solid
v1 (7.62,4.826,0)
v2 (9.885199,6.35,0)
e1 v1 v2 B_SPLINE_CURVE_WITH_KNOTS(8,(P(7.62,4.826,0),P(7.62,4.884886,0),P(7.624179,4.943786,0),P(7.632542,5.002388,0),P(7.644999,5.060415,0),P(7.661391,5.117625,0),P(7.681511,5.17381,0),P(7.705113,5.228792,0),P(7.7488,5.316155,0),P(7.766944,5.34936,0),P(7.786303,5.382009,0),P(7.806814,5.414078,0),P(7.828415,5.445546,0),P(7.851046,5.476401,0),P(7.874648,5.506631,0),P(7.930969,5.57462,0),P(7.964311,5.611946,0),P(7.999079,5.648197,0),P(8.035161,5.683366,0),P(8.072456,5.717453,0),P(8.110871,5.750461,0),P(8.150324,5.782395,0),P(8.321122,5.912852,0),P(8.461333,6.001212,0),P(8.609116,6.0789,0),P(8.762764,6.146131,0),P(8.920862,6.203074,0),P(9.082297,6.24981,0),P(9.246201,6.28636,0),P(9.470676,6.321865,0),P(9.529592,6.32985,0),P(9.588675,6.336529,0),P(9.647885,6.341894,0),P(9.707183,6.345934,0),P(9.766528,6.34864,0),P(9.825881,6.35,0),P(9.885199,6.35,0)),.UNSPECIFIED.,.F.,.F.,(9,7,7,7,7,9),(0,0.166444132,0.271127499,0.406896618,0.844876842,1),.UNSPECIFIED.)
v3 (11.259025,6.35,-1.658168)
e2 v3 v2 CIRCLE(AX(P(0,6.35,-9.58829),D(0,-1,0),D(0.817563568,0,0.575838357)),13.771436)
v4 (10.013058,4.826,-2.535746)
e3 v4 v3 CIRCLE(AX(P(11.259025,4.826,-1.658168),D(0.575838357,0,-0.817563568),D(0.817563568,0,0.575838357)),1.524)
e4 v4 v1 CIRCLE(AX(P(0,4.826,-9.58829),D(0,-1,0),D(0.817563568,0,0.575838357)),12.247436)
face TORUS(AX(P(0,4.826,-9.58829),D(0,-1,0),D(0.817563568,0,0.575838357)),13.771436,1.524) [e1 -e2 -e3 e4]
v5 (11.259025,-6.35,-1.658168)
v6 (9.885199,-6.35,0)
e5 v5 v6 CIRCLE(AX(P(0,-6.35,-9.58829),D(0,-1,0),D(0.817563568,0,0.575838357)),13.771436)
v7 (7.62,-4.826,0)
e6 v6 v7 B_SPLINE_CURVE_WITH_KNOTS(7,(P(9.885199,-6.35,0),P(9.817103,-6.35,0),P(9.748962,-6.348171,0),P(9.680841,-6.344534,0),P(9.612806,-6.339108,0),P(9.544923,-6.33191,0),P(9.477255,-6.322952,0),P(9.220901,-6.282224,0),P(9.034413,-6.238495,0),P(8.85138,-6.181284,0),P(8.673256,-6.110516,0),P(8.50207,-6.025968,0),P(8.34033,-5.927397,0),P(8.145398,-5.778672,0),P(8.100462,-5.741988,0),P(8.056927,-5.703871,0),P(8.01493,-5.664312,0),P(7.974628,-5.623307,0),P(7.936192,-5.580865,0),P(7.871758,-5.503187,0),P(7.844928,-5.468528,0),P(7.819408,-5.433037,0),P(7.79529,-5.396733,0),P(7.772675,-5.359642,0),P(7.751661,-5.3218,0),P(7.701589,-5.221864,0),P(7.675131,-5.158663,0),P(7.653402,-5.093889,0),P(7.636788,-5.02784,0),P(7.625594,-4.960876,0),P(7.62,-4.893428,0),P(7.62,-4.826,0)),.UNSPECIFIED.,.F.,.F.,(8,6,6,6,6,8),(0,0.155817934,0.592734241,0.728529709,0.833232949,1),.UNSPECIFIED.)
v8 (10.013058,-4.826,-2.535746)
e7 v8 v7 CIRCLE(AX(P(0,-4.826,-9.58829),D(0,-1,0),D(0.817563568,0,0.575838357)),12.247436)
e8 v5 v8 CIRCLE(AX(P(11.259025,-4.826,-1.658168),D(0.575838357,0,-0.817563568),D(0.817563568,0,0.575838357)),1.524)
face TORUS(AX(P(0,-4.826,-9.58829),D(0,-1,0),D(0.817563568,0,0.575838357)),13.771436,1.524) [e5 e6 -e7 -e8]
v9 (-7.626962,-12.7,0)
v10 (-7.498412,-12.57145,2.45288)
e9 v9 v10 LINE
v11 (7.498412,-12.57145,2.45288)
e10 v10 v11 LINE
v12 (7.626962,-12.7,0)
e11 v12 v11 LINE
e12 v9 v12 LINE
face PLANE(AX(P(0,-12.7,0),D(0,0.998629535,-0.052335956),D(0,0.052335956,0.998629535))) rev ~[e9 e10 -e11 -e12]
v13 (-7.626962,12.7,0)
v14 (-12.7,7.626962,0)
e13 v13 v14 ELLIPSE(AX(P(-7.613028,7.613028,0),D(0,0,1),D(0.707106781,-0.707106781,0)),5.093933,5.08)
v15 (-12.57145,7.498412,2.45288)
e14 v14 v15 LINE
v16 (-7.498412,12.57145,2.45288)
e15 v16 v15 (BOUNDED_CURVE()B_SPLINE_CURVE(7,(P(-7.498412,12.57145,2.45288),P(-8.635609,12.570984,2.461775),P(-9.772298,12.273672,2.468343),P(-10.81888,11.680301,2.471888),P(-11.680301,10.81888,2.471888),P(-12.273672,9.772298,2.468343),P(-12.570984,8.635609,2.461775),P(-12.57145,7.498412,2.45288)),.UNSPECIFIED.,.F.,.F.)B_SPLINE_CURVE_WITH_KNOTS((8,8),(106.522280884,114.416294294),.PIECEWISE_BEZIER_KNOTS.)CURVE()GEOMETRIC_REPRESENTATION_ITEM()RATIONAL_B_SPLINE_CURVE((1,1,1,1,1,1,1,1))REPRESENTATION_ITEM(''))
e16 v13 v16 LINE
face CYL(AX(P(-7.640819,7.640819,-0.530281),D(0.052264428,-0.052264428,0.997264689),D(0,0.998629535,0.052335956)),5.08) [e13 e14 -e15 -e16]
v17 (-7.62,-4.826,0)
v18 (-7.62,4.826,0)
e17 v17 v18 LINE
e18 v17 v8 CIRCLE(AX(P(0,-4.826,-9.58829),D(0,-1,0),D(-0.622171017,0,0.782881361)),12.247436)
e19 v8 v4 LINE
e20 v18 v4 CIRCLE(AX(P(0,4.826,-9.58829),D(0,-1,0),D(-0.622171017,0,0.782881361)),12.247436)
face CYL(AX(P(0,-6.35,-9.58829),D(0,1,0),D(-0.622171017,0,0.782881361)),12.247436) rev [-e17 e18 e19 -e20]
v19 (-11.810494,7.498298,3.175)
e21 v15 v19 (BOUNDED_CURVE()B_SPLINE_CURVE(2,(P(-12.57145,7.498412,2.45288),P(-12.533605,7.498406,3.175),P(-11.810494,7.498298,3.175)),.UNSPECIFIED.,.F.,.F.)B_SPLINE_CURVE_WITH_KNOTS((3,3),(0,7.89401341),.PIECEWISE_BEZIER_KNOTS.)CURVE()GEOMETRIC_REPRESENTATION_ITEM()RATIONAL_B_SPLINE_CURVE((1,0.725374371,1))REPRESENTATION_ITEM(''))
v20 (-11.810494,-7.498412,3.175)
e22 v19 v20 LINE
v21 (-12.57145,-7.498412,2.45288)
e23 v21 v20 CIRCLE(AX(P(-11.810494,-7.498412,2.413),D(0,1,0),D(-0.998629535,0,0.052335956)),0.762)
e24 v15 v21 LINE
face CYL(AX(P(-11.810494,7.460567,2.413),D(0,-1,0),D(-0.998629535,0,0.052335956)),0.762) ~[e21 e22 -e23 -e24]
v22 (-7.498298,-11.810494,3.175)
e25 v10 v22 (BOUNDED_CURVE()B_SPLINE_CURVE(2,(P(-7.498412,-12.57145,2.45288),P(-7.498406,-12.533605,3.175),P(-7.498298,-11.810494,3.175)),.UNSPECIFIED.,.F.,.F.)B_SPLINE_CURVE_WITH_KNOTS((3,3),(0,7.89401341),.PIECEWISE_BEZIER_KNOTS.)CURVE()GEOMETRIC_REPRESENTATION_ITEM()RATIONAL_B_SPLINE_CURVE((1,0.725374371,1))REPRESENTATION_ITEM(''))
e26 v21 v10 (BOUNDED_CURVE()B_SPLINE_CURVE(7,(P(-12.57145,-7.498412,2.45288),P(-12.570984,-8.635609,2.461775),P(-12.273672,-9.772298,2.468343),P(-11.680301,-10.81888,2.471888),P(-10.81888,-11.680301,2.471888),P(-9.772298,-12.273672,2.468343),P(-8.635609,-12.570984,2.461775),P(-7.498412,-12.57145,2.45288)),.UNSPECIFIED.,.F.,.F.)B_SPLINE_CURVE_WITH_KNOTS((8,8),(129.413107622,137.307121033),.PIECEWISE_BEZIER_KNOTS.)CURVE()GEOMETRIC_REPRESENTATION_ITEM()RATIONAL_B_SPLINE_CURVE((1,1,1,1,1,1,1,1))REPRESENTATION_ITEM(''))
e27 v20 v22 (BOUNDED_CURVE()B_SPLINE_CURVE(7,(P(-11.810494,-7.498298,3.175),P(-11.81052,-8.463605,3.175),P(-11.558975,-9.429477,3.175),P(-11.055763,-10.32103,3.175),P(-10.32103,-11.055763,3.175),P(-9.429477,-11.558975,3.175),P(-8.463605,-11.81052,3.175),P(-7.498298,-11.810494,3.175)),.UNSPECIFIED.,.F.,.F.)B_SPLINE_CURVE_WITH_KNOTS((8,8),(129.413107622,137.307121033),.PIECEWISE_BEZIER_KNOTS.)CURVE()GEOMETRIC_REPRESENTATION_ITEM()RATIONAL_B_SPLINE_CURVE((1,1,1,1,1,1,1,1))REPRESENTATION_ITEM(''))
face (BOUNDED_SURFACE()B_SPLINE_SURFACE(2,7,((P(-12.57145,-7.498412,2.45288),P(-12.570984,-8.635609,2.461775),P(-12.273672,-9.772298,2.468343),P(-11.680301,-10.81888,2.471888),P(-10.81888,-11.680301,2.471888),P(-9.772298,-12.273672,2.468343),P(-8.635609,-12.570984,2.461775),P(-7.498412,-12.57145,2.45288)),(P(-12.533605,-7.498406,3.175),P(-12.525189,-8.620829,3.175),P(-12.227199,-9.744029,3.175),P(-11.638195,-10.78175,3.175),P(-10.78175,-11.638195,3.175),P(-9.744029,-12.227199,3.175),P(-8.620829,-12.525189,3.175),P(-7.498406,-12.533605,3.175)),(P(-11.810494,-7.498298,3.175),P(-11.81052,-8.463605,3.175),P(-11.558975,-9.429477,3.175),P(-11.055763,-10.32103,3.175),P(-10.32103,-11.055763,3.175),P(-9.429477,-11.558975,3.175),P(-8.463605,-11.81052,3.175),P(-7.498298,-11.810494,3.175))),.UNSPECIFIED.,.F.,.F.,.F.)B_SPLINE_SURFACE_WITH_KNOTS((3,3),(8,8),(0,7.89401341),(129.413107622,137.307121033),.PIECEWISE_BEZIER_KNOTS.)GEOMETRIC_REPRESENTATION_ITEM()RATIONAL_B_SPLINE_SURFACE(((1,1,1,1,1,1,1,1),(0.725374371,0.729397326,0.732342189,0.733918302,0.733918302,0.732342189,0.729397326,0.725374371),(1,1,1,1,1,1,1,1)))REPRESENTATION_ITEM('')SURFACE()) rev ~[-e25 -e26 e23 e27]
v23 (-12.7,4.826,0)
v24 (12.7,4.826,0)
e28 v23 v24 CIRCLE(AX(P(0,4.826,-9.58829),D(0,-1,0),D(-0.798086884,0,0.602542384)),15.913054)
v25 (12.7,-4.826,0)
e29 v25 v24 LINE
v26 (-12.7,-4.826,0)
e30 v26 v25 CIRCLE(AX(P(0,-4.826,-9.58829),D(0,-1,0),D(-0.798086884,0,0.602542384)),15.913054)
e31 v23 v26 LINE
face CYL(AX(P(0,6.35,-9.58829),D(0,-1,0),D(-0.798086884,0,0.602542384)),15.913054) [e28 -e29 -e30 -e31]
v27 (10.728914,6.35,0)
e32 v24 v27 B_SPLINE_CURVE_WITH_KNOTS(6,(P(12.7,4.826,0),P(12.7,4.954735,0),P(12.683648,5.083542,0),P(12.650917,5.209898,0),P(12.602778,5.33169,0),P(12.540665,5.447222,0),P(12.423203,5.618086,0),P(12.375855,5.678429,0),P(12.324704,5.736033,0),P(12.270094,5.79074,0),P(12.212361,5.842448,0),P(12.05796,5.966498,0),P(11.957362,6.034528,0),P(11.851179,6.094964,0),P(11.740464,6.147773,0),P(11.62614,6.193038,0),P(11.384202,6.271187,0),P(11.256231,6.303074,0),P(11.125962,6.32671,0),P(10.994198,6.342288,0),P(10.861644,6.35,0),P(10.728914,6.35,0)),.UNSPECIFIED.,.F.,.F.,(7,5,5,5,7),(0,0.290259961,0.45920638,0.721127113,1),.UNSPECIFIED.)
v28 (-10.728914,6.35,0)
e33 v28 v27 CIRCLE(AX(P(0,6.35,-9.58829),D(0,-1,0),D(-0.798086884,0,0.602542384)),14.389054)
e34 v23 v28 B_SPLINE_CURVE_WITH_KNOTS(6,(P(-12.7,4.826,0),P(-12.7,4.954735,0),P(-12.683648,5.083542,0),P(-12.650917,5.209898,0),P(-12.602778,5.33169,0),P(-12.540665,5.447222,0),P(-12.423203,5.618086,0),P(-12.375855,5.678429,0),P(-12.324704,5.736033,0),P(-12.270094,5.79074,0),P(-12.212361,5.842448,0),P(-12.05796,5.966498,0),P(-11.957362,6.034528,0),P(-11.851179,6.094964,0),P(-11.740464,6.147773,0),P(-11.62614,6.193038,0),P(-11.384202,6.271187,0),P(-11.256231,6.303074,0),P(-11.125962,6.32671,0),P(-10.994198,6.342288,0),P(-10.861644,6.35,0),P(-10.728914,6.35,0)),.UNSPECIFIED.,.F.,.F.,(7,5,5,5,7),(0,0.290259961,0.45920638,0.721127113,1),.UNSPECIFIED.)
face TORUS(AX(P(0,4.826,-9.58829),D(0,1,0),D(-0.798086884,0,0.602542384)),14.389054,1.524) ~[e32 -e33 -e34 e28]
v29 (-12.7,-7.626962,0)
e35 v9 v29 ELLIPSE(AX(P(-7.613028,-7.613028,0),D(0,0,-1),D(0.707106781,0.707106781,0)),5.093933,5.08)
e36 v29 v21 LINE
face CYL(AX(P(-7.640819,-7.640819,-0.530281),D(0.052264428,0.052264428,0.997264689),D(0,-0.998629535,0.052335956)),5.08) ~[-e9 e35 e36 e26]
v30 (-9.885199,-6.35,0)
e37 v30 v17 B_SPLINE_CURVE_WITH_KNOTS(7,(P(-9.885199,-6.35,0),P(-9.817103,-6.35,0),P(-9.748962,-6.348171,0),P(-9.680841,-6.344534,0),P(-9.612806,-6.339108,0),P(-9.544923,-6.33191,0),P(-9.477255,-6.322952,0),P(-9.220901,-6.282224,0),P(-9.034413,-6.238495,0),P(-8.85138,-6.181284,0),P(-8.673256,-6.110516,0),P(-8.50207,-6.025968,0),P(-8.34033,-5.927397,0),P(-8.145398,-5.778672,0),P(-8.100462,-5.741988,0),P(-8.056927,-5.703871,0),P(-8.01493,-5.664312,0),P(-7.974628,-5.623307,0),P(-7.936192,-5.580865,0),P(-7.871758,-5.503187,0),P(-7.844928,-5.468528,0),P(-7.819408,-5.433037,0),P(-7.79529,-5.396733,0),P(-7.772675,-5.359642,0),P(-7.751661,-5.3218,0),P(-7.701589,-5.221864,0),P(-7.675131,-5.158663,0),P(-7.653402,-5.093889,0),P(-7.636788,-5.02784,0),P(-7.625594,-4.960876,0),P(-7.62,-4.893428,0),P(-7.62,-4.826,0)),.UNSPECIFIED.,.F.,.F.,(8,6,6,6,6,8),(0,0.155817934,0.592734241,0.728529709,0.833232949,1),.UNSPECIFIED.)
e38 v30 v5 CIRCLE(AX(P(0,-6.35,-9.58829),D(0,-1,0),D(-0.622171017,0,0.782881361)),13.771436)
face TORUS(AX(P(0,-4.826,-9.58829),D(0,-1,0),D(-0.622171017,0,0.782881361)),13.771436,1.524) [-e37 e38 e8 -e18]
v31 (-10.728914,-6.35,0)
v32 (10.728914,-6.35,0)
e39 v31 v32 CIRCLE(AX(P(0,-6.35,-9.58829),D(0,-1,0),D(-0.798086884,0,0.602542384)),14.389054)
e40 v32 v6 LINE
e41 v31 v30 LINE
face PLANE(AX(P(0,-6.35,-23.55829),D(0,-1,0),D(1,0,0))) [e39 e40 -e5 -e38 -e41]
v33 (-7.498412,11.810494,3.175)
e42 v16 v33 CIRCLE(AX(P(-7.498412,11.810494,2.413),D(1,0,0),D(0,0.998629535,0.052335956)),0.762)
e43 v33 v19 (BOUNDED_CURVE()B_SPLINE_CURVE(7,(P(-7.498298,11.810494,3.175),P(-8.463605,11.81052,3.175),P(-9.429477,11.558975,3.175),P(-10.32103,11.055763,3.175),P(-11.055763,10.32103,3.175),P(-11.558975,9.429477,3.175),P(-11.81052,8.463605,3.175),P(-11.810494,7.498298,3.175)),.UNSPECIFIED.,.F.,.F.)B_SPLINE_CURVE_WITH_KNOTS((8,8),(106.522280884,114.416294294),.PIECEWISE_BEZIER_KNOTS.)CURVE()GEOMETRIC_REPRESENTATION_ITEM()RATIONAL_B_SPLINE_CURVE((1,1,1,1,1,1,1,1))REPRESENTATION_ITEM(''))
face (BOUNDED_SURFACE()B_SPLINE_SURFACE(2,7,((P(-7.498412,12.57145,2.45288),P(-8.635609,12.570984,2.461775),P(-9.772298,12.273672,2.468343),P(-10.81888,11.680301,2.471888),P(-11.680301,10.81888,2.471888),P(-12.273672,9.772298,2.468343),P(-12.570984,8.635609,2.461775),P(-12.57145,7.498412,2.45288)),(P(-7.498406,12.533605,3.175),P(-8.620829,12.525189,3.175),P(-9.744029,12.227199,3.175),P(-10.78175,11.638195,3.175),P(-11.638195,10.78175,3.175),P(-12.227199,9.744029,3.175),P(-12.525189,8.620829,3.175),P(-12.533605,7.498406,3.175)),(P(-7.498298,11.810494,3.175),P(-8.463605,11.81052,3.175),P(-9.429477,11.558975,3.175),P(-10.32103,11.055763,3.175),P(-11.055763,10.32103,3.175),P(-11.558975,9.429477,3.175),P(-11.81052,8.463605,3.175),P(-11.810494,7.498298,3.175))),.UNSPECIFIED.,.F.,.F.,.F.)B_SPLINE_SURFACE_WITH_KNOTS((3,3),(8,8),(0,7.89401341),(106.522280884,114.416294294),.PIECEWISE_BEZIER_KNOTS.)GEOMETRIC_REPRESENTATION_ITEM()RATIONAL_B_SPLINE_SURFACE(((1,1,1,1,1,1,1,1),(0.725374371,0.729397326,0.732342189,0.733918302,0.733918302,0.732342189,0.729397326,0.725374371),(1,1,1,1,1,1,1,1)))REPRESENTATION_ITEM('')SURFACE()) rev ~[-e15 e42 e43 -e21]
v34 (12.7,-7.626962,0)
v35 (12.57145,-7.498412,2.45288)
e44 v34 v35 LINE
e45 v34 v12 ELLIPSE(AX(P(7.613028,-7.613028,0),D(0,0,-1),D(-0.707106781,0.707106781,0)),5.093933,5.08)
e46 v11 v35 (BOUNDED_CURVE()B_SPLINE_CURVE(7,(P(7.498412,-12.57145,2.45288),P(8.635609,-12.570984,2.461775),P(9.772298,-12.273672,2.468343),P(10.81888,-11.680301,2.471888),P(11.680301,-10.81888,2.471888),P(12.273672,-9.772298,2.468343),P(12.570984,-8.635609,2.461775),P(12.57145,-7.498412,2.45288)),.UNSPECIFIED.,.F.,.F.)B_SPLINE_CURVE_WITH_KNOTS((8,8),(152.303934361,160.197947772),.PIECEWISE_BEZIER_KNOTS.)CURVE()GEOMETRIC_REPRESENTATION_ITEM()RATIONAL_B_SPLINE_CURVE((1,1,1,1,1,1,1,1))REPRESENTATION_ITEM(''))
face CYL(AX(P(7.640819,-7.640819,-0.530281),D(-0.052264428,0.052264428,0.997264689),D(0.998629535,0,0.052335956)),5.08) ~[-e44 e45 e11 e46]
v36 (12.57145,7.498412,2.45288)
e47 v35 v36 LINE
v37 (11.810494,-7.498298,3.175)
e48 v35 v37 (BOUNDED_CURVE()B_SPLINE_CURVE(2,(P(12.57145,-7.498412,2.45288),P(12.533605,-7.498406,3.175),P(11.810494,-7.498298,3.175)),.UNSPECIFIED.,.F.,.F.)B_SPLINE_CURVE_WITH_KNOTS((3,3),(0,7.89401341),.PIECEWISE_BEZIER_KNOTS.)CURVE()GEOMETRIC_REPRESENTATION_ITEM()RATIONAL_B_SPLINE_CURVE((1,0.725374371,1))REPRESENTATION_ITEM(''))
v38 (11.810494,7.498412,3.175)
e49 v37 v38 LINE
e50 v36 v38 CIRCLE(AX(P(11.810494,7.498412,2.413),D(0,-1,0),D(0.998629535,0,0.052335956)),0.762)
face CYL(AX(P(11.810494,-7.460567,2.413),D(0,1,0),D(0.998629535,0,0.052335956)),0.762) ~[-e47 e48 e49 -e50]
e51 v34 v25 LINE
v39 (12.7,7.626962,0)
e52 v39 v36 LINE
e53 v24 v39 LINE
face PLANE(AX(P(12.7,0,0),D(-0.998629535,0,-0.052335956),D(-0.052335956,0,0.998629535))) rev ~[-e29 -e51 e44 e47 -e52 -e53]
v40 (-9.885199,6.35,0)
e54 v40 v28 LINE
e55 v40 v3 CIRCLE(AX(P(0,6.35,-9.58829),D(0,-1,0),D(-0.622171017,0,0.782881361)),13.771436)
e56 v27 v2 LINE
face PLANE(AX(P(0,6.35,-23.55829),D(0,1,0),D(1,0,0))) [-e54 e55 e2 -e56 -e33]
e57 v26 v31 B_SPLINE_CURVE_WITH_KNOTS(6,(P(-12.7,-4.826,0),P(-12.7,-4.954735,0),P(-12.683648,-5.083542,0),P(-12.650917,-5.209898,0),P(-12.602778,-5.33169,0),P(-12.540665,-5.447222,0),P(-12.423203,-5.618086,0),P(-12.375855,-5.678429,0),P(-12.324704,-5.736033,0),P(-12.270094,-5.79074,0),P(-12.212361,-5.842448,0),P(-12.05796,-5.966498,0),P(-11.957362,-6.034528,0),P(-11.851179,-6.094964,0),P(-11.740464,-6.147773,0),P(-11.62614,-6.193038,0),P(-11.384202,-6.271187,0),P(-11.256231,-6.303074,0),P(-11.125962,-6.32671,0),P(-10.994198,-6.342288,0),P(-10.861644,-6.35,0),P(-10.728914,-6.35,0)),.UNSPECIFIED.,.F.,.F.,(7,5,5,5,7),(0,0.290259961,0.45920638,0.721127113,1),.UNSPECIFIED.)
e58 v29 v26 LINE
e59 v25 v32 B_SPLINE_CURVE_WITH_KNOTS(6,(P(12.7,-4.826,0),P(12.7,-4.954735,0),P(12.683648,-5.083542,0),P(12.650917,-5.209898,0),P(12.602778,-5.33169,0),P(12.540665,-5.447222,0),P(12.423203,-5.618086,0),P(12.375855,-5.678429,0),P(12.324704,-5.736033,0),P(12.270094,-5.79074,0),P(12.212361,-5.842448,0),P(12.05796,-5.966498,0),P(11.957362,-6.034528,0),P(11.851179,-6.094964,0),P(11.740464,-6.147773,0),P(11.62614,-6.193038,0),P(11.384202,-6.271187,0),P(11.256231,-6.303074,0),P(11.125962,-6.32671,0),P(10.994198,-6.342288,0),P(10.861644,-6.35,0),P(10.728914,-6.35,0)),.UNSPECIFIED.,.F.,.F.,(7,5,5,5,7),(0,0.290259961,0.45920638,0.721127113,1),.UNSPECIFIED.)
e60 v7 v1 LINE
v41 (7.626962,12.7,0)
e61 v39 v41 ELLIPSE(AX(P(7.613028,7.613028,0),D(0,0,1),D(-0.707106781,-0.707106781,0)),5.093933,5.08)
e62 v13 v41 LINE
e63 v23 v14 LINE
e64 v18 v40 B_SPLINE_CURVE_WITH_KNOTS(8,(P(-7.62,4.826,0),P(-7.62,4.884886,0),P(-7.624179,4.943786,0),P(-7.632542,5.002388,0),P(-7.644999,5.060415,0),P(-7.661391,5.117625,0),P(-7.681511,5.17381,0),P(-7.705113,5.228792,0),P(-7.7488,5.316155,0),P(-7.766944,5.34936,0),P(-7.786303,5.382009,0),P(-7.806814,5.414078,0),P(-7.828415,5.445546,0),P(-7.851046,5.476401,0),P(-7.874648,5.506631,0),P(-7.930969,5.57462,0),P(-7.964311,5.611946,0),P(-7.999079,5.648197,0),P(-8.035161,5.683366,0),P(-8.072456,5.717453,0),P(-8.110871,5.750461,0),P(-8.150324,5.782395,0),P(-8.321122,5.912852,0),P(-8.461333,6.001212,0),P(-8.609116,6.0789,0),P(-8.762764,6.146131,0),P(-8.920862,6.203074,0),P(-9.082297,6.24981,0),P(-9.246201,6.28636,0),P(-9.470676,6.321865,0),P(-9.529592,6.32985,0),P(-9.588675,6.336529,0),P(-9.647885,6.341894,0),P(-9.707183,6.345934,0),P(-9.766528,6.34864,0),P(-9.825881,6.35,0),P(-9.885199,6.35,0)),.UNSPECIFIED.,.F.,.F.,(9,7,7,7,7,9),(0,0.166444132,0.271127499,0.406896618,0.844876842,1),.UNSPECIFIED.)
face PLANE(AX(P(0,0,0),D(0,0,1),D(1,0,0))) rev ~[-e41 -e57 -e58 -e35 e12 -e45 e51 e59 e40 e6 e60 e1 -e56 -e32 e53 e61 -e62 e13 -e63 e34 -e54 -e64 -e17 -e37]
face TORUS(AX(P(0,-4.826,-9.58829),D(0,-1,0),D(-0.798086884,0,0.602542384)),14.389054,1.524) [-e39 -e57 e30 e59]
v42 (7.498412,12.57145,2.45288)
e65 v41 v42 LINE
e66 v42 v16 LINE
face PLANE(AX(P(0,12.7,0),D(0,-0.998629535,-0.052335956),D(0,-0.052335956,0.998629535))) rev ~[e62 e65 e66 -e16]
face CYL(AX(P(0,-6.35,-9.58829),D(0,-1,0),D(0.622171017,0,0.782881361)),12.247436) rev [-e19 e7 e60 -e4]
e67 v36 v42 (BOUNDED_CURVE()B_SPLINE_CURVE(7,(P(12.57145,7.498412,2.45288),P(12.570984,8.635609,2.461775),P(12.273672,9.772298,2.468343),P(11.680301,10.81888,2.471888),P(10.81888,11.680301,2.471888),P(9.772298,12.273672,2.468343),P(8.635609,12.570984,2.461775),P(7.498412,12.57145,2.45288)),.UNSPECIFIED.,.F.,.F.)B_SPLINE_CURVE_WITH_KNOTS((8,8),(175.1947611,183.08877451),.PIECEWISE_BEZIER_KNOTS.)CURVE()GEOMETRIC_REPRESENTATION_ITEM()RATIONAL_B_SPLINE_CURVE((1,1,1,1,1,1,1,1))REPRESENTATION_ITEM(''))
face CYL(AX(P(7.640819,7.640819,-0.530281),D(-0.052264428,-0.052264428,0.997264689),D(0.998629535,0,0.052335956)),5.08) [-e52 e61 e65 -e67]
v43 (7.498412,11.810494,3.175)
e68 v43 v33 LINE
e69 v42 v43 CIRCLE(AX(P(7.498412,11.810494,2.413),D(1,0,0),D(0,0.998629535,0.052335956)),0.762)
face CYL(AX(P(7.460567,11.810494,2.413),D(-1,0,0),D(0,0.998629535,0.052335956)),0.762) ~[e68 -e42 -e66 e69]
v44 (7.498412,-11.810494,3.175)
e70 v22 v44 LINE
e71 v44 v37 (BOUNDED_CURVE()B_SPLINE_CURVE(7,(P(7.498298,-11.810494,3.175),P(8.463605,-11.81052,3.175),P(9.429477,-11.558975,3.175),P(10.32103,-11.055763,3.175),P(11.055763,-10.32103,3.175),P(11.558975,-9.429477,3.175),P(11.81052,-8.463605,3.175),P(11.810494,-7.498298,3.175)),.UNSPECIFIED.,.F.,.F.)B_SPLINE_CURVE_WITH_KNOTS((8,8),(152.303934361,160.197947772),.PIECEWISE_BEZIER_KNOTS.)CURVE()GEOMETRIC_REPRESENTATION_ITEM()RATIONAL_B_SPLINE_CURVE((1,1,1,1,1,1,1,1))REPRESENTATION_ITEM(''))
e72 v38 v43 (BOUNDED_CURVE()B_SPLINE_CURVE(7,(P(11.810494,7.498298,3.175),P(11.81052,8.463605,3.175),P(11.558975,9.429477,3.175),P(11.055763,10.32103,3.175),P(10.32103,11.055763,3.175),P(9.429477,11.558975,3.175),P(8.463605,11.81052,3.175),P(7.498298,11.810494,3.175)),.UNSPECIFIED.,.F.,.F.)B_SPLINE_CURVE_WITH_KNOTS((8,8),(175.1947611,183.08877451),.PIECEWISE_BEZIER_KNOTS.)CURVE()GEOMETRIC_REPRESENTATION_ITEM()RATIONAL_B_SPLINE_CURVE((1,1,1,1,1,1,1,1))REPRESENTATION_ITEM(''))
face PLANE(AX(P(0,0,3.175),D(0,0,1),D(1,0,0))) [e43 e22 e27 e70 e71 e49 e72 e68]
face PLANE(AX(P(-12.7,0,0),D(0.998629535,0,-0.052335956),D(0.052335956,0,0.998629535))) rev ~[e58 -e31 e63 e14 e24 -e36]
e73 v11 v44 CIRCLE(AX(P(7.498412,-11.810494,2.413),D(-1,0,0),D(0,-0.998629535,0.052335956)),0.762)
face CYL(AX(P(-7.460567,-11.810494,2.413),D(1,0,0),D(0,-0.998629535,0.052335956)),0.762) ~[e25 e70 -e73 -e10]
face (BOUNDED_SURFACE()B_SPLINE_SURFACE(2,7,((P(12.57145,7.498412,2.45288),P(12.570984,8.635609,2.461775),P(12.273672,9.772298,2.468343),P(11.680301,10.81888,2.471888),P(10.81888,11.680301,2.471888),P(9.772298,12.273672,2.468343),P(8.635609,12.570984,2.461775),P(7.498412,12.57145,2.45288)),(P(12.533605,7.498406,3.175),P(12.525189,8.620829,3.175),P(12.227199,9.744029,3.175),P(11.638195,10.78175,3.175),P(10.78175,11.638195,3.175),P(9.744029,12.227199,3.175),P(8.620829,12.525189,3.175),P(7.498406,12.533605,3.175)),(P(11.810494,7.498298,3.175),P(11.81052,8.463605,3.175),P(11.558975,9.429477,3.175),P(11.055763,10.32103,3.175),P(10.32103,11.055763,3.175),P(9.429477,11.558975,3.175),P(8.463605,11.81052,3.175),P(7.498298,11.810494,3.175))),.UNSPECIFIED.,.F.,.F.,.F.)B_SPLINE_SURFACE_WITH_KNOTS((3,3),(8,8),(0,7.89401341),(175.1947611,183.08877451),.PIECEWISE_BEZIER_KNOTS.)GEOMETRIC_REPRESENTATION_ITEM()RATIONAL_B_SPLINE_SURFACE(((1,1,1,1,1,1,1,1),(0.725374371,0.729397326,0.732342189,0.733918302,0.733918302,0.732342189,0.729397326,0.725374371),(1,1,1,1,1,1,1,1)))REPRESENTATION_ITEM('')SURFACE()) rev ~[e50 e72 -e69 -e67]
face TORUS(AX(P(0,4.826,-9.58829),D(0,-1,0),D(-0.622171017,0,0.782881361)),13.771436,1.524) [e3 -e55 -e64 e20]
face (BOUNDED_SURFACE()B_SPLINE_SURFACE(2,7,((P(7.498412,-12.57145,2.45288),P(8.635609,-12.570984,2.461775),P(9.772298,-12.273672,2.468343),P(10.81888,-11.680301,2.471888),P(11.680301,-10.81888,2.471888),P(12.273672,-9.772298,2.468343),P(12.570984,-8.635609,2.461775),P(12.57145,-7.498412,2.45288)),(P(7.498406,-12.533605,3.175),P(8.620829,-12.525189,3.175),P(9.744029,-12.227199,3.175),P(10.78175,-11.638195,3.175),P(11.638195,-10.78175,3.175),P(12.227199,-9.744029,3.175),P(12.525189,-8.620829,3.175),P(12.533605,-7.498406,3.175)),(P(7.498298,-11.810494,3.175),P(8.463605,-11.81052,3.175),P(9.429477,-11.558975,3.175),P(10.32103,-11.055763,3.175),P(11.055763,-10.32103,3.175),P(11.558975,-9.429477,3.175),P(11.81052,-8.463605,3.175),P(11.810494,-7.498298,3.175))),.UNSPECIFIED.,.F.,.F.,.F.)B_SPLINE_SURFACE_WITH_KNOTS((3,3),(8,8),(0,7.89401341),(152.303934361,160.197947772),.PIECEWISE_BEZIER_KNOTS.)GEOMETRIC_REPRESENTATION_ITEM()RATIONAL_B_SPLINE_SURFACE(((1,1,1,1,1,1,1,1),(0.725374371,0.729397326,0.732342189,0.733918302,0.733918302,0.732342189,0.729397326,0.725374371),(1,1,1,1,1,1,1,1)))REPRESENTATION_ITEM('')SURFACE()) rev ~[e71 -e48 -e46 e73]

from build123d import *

# Parameters (mm, degrees)
F0_W     = 25.4
F0_H     = 25.4
F1_DEPTH = 3.175
F1_TAPER = 3
F3_W     = 5.08
F3_H     = 6.35
F6_DEPTH = 12.7
F7_R     = 5.08
F8_R     = 1.524
F9_R     = 0.762


with BuildPart() as f1:
    # F0 (on Top) → F1 (new body)
    with BuildSketch(Plane.XY):
        Rectangle(F0_W, F0_H)
    extrude(amount=F1_DEPTH, taper=F1_TAPER)

    # F4: sweep along a path in F2
    with BuildLine(Plane.XZ) as f4_path:
        ThreePointArc((-10.16, 0), (0, -23.5582897328), (10.16, 0))
    # F3 (on Top) → F4 (sweep)
    with BuildSketch(Plane.XY):
        with Locations((-10.16, -3.175)):
            Rectangle(F3_W, F3_H)
        with Locations((-10.16, 3.175)):
            Rectangle(F3_W, F3_H)
    sweep(path=f4_path.line)

    # F5 (on face) → F6 (join, through all)
    with BuildSketch(Plane.XZ.offset(6.35)):
        with BuildLine():
            ThreePointArc((10.0130578512, -2.535746045), (-1.743325406, -21.7110170055), (-7.62, 0))
            Line((-7.62, 0), (-12.7, 0))
            ThreePointArc((-12.7, 0), (0, -25.5013441222), (12.7, 0))
            Line((12.7, 0), (10.16, 0))
            Line((10.16, 0), (10.0130578512, -2.535746045))
        make_face()
        with BuildLine():
            ThreePointArc((7.62, 0), (8.9072265211, -1.1822790439), (10.0130578512, -2.535746045))
            Line((10.0130578512, -2.535746045), (10.16, 0))
            Line((10.16, 0), (7.62, 0))
        make_face()
    extrude(amount=-F6_DEPTH)

    # F7
    f7_edges = [f1.edges().sort_by_distance(p)[0] for p in [
        (12.616803, 12.616803, 1.5875),
        (-12.616803, 12.616803, 1.5875),
        (12.616803, -12.616803, 1.5875),
        (-12.616803, -12.616803, 1.5875),
    ]]
    fillet(f7_edges, radius=F7_R)

    # F8
    f8_edges = [f1.edges().sort_by_distance(p)[0] for p in [
        (0, -6.35, -21.835726),
        (0, -6.35, -25.501344),
        (0, 6.35, -25.501344),
        (0, 6.35, -21.835726),
    ]]
    fillet(f8_edges, radius=F8_R)

    # F9
    f9_edges = [f1.edges().sort_by_distance(p)[0] for p in [
        (0, 12.533605, 3.175),
        (11.048589, 11.048589, 3.175),
        (-11.048589, 11.048589, 3.175),
        (12.533605, 0, 3.175),
        (-12.533605, 0, 3.175),
        (11.048589, -11.048589, 3.175),
        (-11.048589, -11.048589, 3.175),
        (0, -12.533605, 3.175),
    ]]
    fillet(f9_edges, radius=F9_R)


solid = f1.part
